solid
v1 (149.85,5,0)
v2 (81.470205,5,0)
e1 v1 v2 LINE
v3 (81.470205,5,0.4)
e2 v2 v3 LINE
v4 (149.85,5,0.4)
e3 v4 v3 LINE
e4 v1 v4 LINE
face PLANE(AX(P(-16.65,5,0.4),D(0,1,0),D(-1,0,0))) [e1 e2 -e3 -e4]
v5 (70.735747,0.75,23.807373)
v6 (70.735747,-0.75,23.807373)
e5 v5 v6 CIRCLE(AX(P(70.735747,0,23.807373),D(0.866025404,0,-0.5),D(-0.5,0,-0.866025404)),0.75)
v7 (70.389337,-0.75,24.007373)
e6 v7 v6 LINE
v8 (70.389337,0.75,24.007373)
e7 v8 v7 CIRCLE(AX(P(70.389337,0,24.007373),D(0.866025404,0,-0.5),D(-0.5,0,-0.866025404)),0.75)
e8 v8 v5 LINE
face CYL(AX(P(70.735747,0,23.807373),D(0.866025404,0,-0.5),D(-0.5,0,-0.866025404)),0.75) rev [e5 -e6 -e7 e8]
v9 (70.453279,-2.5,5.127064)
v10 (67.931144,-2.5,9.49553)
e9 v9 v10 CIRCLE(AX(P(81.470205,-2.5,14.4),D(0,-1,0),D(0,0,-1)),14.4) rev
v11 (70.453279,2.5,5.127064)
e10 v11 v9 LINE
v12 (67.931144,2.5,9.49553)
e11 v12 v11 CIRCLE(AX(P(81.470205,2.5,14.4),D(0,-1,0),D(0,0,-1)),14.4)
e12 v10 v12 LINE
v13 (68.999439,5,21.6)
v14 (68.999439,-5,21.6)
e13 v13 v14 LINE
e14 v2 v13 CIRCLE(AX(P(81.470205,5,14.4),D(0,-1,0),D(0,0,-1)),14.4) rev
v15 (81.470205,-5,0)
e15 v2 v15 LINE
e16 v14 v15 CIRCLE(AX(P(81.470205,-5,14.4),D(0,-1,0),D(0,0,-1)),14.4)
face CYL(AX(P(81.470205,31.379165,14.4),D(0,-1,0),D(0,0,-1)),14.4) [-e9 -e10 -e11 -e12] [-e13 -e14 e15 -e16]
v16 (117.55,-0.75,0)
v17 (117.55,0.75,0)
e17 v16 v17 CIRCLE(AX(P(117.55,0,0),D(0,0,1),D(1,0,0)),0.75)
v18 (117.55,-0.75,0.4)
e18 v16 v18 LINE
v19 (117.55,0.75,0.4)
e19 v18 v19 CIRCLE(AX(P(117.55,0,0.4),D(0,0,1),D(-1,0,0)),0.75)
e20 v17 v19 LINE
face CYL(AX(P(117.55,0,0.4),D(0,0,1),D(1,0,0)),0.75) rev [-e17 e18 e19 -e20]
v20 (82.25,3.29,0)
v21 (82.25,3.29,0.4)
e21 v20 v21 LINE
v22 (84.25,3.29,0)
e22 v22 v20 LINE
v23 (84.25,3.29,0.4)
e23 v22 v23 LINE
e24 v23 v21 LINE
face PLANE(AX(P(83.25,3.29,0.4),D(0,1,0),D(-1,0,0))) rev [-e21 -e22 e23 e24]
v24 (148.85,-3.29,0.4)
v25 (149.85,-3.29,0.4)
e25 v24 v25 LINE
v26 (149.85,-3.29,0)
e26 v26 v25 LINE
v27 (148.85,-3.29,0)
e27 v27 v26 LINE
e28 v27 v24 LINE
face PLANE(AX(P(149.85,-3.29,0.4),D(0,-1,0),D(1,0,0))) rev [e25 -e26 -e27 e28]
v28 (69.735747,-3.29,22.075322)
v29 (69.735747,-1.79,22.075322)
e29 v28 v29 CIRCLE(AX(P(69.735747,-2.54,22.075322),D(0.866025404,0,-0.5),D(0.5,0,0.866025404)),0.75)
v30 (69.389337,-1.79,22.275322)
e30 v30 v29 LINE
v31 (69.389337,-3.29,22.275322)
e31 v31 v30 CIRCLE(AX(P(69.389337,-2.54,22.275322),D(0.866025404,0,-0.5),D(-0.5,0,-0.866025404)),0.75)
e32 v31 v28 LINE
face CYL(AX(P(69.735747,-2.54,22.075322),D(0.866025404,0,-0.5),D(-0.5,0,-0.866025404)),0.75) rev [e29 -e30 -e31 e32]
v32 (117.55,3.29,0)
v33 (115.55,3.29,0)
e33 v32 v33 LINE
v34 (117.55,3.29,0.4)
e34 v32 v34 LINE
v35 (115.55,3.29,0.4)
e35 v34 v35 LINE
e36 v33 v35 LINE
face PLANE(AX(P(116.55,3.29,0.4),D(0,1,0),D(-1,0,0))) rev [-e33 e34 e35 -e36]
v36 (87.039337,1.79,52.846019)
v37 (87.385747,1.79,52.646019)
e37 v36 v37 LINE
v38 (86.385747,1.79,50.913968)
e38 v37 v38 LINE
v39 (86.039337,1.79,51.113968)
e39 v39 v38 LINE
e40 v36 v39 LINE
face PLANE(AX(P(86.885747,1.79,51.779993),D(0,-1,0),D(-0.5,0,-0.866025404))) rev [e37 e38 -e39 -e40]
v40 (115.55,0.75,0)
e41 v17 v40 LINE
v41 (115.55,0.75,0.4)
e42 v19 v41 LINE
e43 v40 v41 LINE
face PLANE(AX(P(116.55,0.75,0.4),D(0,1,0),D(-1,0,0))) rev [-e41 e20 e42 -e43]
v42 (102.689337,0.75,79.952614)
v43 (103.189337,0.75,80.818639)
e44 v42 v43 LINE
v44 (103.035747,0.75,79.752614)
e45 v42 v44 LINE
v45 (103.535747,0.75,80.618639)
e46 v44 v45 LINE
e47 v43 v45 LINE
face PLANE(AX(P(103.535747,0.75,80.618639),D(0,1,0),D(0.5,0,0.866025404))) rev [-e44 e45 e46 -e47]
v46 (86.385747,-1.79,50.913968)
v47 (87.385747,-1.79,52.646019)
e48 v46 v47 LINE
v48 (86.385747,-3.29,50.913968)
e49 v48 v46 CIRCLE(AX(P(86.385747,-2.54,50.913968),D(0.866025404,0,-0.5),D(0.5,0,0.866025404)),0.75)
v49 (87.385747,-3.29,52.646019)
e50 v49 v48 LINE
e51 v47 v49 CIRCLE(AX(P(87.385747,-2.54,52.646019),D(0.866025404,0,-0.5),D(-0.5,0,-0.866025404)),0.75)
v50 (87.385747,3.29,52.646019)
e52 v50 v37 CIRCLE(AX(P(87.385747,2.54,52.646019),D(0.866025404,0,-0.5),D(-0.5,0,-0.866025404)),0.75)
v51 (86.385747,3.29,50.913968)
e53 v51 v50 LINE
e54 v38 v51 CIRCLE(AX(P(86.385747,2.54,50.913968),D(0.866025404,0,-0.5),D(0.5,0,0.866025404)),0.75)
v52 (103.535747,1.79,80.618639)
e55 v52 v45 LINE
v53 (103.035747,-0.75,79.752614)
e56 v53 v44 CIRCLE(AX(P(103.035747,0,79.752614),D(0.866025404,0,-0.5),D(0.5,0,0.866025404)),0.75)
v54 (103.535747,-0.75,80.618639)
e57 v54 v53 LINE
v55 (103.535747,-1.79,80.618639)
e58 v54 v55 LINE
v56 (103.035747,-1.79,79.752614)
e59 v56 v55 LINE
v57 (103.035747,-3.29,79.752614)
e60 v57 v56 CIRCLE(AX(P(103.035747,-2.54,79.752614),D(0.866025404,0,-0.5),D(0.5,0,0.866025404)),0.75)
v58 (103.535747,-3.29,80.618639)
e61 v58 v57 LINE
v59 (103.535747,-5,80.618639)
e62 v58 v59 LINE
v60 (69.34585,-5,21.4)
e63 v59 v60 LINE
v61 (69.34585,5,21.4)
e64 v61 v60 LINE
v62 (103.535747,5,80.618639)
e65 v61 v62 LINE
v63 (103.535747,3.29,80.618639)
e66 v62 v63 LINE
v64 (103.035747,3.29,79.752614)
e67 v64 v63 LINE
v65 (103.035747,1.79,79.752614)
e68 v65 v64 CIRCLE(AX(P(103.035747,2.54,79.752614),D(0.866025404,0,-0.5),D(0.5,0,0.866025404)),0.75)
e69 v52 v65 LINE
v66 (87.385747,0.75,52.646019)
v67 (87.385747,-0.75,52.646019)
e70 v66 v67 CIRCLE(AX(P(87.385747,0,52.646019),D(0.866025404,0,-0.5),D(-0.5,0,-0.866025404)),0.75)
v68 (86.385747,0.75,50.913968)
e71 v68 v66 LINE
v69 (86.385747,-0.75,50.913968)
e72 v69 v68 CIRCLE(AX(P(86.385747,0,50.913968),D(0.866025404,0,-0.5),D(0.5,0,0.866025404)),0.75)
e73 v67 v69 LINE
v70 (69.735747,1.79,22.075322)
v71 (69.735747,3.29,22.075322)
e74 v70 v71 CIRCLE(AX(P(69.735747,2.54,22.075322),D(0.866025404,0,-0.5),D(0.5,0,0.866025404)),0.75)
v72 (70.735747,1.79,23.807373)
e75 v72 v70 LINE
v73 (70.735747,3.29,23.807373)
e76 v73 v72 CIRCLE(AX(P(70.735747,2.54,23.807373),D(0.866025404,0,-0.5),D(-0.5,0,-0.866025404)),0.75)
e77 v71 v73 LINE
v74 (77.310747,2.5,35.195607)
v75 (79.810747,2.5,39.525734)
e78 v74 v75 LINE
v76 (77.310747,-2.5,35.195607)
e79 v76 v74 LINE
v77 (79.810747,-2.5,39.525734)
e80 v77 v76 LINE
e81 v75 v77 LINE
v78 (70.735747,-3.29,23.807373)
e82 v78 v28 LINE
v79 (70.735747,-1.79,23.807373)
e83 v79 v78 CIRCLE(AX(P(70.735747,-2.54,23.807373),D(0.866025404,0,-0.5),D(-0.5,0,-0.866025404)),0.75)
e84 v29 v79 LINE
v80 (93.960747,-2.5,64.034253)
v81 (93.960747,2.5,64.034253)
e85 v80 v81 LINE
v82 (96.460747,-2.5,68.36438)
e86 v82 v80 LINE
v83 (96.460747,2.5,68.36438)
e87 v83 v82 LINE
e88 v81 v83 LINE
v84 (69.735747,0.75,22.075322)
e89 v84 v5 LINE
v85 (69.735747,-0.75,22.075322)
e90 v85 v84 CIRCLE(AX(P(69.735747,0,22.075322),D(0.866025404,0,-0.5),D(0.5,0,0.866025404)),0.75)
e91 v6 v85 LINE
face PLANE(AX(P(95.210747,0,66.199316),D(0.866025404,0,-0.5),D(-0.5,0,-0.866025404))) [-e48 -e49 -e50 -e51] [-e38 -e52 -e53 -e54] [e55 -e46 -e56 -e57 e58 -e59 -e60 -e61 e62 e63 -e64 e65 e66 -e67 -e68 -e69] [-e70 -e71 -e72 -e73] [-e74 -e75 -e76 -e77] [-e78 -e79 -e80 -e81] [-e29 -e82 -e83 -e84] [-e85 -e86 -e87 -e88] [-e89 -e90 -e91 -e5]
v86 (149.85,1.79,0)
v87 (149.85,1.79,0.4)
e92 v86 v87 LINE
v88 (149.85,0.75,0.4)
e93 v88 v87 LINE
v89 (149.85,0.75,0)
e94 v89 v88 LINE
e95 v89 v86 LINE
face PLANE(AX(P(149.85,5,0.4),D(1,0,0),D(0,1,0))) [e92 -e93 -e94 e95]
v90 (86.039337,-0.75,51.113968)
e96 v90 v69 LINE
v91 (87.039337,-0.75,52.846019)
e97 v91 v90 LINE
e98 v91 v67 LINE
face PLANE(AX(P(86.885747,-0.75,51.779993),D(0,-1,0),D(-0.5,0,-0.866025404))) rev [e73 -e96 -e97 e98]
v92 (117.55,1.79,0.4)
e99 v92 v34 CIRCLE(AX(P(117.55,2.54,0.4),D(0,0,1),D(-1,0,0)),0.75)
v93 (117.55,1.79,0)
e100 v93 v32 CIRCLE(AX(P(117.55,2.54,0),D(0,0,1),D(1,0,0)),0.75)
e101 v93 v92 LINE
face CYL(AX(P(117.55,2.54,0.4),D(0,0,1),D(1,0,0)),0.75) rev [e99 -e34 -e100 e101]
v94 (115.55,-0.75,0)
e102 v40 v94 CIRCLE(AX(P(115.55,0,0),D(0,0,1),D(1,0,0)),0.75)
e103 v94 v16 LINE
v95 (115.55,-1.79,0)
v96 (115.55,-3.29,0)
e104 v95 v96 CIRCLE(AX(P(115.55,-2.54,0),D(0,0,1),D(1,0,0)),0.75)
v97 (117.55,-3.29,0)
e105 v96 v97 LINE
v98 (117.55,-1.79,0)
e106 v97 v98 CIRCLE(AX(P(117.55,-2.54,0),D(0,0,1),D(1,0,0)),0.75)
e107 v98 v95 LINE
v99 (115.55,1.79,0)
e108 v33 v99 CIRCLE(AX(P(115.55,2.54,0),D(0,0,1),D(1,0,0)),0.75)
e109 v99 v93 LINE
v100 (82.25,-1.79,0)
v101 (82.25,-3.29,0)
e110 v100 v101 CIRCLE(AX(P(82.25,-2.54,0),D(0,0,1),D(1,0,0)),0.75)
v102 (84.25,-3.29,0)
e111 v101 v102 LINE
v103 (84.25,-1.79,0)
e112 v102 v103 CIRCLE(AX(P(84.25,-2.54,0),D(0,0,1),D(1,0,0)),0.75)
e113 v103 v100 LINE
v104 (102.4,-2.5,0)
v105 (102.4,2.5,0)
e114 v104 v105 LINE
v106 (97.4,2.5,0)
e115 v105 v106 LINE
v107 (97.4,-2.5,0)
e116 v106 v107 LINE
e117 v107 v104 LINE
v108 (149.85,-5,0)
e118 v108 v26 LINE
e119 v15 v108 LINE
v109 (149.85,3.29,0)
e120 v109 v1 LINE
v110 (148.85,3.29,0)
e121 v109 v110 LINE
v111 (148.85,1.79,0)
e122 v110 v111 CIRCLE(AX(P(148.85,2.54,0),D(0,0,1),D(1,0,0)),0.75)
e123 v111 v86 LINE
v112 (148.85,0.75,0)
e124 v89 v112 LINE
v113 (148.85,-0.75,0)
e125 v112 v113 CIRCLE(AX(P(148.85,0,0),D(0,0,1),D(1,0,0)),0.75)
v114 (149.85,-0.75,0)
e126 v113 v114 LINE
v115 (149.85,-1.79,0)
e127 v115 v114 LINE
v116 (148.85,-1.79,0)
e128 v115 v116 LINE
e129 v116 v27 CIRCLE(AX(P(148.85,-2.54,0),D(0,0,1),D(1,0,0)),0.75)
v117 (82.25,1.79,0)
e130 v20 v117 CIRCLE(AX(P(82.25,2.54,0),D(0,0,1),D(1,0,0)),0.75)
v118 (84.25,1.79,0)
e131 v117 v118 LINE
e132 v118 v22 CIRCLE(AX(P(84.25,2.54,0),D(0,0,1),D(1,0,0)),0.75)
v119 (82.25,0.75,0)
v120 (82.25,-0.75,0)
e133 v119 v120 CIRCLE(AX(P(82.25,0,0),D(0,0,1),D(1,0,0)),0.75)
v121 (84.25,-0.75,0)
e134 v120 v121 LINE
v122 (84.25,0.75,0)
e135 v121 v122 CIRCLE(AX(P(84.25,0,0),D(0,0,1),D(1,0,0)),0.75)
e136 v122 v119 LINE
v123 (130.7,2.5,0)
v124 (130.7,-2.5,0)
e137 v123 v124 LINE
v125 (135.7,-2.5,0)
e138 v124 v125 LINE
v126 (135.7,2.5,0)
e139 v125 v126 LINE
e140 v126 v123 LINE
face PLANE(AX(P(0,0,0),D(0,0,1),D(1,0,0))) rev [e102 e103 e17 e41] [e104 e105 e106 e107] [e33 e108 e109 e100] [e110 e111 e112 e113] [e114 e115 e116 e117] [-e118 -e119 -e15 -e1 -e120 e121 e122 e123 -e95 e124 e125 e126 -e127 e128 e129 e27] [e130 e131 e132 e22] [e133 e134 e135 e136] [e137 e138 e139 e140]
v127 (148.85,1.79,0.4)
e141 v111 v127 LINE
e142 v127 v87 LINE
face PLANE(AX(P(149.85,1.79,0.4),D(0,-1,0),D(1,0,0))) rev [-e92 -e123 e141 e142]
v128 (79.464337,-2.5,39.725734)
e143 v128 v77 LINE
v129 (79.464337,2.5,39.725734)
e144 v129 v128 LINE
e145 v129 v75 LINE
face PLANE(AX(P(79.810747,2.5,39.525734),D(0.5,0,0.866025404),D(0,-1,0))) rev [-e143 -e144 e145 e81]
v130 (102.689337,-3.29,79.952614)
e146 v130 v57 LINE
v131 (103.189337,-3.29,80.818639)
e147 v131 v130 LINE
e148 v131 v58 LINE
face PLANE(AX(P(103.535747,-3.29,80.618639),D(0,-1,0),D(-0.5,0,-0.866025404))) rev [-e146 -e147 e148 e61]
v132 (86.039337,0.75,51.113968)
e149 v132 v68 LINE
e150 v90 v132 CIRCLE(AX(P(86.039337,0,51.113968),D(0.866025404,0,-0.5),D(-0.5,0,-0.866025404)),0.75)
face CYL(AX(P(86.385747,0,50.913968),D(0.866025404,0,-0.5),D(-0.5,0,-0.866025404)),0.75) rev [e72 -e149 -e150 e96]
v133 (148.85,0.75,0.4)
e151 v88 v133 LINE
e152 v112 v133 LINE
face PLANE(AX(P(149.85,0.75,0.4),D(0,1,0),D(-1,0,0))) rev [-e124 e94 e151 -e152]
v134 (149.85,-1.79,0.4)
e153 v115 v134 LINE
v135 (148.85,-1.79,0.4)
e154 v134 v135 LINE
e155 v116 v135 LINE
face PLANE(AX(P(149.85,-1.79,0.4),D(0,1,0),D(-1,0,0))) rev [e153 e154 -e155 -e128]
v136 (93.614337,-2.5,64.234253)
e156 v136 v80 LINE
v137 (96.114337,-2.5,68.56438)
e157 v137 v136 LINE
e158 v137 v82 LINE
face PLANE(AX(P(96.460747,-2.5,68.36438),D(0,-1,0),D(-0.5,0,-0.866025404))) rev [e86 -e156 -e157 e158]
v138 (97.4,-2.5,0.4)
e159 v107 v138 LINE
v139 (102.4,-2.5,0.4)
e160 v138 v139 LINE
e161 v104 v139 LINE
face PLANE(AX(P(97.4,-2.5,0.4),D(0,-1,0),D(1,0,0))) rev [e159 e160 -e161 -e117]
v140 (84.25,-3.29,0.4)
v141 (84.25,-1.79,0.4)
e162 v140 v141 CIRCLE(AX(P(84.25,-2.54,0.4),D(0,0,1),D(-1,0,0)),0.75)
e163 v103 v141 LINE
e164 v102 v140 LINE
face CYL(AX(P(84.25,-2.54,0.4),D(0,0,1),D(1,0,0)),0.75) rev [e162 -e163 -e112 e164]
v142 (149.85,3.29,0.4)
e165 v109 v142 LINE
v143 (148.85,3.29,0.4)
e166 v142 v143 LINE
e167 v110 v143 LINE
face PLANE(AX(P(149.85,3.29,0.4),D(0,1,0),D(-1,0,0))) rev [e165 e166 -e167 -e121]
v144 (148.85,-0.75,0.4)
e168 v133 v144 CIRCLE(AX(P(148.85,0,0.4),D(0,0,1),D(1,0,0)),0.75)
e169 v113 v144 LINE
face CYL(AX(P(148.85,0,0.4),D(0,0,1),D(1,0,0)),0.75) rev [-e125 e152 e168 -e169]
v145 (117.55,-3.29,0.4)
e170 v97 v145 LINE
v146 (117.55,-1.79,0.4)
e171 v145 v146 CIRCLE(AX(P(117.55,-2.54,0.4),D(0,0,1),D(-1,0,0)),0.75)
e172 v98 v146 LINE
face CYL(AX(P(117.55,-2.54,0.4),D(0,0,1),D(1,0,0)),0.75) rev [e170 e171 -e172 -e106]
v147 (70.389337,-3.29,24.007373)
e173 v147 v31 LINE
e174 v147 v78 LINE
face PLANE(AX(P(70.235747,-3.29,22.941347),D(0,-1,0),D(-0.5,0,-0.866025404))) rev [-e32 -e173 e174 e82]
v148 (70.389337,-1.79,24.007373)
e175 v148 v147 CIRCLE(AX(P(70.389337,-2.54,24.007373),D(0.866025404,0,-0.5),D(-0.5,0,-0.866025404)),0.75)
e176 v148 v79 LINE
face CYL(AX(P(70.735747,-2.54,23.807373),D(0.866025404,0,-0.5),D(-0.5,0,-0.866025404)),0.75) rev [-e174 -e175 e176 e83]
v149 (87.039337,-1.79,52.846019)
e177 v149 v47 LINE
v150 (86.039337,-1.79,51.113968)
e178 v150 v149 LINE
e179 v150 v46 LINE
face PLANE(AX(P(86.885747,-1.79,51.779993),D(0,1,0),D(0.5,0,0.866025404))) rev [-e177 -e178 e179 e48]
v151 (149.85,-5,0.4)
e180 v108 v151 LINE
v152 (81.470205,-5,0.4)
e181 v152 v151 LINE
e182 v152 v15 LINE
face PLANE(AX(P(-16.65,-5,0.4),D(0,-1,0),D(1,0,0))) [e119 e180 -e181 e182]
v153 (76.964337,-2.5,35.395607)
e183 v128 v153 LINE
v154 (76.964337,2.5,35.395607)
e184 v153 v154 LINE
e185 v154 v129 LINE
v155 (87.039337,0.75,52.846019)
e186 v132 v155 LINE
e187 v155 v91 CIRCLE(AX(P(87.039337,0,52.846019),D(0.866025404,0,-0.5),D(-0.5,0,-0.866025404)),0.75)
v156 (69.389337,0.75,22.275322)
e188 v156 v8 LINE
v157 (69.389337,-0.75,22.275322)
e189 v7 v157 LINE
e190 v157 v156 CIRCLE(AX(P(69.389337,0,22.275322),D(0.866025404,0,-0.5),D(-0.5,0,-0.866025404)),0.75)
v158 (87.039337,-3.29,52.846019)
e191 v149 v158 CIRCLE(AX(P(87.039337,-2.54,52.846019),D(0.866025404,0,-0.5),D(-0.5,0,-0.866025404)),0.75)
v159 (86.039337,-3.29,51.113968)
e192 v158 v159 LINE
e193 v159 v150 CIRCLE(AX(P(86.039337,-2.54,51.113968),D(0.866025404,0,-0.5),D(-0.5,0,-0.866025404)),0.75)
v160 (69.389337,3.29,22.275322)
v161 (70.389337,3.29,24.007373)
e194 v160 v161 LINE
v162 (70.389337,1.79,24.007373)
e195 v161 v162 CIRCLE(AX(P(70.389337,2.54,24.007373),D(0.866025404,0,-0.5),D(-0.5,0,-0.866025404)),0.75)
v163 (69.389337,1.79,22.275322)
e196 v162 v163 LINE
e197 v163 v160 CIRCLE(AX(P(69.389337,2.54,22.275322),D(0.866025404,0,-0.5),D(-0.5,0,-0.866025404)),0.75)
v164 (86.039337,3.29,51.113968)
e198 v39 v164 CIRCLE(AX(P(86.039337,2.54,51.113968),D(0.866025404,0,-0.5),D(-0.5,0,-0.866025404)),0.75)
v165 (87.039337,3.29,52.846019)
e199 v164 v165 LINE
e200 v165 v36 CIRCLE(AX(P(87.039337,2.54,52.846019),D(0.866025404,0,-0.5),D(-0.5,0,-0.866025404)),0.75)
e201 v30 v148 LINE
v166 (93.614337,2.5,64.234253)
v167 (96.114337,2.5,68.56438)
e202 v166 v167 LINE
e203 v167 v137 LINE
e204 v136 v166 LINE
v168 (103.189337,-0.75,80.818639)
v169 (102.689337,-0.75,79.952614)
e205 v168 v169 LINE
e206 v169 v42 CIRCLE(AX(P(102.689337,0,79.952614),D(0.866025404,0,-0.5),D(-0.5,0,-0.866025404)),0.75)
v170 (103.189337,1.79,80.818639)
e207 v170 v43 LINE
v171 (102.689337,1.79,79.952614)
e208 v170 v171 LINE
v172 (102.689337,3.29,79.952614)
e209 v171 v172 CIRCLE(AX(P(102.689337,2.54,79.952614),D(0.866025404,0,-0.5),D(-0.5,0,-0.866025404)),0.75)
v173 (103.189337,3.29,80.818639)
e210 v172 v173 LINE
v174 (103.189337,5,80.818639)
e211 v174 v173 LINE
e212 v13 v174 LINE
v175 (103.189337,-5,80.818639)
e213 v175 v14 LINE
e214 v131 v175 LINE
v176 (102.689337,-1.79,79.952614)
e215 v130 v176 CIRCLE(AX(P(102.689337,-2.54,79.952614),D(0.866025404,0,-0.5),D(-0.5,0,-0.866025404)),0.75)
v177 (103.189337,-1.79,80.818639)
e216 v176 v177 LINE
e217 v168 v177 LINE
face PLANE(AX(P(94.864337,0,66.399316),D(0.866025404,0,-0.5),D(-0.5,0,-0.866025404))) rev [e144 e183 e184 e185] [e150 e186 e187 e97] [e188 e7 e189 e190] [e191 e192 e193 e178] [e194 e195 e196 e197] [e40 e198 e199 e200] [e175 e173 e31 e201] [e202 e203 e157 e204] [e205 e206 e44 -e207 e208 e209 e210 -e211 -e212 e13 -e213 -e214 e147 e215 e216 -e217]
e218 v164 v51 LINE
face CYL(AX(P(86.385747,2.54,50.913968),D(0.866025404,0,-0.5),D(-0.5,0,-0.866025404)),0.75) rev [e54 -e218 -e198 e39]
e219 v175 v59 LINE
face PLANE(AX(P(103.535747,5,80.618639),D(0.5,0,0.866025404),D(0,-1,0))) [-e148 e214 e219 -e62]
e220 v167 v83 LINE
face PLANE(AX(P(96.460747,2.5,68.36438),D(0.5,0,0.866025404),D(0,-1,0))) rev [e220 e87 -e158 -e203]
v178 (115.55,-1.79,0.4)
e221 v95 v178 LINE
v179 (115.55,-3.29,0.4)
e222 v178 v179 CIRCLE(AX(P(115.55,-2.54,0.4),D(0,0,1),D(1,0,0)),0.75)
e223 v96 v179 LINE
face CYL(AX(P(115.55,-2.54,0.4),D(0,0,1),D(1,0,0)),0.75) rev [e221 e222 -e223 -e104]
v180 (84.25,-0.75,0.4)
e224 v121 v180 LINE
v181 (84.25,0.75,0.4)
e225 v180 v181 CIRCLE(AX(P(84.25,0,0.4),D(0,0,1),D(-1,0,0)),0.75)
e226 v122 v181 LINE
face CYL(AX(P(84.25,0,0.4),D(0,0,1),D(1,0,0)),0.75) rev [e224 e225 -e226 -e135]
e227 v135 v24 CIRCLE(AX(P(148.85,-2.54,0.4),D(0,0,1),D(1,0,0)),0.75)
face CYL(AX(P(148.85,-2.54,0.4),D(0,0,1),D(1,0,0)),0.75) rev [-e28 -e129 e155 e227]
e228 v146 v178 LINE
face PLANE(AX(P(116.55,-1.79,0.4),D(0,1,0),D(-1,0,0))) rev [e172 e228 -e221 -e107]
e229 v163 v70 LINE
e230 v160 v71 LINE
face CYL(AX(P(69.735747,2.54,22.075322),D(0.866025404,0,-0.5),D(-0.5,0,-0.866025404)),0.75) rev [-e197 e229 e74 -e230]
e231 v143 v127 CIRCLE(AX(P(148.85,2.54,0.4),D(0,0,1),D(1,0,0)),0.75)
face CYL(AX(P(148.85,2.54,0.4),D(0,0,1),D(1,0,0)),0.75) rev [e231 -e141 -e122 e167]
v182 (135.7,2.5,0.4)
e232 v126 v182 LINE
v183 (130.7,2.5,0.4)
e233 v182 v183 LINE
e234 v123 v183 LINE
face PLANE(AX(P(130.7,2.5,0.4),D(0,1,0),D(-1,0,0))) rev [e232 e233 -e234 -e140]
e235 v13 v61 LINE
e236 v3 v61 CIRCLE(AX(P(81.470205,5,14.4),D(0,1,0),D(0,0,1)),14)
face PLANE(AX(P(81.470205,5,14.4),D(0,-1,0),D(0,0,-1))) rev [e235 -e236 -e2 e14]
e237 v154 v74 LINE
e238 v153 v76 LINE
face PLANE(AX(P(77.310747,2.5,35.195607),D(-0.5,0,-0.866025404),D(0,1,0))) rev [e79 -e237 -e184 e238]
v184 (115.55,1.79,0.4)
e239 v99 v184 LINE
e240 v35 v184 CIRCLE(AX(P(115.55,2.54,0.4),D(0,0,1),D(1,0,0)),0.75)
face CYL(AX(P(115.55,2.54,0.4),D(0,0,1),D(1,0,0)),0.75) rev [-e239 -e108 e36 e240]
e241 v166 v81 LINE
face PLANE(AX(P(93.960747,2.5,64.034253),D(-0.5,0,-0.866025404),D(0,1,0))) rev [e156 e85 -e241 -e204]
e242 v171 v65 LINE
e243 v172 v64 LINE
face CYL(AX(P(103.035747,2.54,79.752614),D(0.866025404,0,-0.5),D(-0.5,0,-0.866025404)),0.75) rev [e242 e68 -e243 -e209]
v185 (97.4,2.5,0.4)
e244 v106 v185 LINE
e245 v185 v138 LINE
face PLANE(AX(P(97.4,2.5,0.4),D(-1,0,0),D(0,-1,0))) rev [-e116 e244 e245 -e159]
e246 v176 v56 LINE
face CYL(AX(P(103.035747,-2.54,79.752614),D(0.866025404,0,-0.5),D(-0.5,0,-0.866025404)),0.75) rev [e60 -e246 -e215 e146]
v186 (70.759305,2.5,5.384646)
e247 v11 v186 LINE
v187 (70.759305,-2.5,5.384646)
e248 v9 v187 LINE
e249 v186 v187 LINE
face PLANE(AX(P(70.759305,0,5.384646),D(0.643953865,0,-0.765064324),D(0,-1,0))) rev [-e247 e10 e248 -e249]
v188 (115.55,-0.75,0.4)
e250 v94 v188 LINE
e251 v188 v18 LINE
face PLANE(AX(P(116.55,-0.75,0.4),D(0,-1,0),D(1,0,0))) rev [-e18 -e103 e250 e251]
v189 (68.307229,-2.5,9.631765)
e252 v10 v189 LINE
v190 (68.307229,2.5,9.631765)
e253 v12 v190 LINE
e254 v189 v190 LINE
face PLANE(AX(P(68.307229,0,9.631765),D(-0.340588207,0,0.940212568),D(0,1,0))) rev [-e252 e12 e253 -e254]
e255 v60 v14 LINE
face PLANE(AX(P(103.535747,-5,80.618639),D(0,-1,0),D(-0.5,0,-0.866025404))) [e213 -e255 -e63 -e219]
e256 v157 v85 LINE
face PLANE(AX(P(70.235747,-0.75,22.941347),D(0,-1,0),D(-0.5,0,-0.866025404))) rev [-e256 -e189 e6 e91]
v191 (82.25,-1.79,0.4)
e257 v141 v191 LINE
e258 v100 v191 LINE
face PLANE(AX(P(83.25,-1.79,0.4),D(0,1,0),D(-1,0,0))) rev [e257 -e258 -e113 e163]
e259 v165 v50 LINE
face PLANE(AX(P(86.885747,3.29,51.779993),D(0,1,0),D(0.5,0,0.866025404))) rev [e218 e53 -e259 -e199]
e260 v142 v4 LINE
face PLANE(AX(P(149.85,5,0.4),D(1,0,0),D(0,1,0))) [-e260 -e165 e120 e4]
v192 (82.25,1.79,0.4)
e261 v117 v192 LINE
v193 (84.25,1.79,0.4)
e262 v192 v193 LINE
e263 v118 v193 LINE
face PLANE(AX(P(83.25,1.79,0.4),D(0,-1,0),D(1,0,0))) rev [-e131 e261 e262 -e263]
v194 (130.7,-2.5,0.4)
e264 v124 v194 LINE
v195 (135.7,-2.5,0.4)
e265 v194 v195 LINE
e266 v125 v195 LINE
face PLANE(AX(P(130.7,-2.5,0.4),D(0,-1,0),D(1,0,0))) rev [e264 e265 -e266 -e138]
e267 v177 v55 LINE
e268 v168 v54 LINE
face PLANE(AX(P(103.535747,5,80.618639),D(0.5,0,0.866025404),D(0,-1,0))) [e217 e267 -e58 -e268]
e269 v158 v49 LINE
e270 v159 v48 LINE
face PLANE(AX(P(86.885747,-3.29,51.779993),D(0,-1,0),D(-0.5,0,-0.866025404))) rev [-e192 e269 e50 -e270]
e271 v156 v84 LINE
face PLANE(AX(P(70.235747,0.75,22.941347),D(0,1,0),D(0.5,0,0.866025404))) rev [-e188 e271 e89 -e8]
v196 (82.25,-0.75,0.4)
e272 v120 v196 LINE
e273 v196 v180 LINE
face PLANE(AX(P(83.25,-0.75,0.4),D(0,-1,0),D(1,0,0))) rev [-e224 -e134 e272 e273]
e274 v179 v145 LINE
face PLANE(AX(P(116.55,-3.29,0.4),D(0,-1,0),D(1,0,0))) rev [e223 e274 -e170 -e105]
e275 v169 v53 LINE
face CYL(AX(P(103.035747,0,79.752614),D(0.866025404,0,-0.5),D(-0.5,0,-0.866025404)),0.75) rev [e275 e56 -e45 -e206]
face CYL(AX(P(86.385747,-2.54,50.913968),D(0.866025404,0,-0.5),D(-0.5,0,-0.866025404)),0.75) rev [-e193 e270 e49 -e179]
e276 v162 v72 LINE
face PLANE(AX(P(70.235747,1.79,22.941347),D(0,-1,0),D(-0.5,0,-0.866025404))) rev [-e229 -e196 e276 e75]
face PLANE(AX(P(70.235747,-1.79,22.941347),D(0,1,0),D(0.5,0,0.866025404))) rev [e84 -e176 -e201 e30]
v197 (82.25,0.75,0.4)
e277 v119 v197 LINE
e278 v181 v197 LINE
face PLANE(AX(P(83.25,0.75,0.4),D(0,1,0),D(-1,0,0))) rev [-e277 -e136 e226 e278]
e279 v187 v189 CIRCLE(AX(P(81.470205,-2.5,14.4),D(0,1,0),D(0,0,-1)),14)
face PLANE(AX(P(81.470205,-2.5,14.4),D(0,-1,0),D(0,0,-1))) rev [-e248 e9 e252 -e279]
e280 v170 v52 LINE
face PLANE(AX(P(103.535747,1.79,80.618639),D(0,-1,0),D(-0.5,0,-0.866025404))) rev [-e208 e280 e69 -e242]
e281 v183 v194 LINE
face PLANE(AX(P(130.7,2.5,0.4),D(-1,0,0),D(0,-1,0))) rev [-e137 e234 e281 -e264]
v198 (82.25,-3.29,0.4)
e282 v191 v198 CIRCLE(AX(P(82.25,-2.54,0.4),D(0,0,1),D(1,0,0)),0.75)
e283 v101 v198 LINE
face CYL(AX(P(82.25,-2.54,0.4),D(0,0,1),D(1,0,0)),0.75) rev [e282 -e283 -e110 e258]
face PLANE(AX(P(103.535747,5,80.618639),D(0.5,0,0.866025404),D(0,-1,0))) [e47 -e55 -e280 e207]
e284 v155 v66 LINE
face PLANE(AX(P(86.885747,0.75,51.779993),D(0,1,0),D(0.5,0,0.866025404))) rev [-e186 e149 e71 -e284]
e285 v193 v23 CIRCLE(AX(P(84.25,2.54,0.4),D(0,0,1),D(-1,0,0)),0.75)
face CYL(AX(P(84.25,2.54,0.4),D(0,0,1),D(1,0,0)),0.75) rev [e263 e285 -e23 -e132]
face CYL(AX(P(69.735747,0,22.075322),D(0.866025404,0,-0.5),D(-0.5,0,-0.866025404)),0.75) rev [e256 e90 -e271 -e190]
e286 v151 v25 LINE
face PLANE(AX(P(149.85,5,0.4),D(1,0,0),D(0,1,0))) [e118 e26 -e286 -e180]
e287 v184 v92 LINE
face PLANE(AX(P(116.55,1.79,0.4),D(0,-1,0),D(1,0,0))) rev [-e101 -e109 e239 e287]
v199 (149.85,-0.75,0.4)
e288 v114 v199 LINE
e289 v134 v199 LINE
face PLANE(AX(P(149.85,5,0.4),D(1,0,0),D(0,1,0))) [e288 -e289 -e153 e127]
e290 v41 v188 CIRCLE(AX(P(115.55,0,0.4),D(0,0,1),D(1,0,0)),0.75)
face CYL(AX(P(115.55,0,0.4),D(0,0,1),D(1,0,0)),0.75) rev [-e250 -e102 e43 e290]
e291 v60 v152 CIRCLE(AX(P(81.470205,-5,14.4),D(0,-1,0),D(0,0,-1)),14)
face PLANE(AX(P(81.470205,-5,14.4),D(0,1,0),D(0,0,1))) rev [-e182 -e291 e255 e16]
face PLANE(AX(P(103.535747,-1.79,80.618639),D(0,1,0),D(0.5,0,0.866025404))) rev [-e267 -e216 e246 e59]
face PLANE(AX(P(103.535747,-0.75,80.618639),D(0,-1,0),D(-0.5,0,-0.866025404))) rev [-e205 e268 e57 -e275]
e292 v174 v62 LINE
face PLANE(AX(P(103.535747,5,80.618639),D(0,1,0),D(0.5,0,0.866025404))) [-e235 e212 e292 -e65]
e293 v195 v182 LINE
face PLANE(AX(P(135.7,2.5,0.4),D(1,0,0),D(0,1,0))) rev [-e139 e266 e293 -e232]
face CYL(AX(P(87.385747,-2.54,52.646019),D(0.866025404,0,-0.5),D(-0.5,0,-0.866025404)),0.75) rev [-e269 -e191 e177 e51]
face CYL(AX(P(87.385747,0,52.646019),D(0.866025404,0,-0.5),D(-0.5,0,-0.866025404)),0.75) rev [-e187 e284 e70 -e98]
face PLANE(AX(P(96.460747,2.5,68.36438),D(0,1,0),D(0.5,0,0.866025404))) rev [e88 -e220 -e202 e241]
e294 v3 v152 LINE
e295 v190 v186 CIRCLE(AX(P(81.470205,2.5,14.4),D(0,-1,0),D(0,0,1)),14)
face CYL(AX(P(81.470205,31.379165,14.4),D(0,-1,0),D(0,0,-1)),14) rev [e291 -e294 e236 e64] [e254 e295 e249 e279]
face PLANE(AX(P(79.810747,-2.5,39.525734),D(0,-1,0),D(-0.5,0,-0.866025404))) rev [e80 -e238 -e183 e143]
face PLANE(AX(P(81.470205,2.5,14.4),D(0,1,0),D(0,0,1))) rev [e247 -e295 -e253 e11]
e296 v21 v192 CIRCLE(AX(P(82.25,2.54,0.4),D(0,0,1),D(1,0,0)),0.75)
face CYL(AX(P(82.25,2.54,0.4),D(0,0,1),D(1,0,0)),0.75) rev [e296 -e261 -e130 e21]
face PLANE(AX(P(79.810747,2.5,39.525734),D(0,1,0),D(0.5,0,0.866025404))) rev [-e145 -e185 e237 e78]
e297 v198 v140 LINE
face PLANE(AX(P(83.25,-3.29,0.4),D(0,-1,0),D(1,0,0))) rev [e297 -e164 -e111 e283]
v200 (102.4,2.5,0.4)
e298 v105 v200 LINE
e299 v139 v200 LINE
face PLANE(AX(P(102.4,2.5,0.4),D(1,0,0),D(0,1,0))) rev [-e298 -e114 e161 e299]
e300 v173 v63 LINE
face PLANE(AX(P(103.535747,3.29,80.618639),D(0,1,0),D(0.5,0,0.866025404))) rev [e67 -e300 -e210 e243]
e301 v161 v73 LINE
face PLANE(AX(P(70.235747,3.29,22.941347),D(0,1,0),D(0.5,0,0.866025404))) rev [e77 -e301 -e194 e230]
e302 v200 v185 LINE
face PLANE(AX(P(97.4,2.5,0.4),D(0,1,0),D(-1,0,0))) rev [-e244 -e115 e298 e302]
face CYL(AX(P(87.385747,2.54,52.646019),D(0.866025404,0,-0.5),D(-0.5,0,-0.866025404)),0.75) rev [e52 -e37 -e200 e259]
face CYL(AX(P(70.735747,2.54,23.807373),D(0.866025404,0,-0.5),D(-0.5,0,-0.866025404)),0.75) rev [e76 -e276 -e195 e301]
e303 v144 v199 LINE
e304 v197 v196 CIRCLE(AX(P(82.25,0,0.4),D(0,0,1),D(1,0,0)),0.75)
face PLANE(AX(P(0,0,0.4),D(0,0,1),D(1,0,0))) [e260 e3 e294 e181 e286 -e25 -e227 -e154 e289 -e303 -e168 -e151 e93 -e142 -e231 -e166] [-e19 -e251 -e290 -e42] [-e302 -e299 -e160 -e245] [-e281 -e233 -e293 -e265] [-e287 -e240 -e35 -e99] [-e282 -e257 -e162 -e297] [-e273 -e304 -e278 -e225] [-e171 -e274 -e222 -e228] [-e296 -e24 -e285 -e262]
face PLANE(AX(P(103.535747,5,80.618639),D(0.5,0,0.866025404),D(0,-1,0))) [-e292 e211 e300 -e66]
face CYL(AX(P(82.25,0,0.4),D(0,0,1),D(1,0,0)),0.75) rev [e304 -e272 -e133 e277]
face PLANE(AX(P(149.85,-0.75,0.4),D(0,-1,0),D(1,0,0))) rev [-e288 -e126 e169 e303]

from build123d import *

# Parameters (mm, degrees)
ESQUISSE1_W                 = 33.3
ESQUISSE1_H                 = 10
BOSS_EXTRU_1_DEPTH          = 0.4
ESQUISSE51_W                = 5
ESQUISSE51_H                = 5
BOSS_EXTRU_3_DEPTH          = 1.75
ENL_V_MAT_EXTRU_2_DEPTH     = 0.1
R_P_TITION_LIN_AIRE4_COUNT  = 5
R_P_TITION_LIN_AIRE4_PITCH  = 33.3
CONVERTIR_VOLUME3_OUTLINE_W = 5
CONVERTIR_VOLUME3_OUTLINE_H = 5
CONVERTIR_VOLUME3_DEPTH     = 2.15
PLI_START                   = -5
PLI_ESQUISS_9_DEPTH         = 10
PLI_ESQUISS_9_2_DEPTH       = 10
PLI_ESQUISS_9_3_DEPTH       = 2.5
PLI_START_2                 = 2.5
PLI_ESQUISS_9_4_DEPTH       = 2.5
PLI_START_3                 = 48.955267378
PLI_ESQUISS_9_5_DEPTH       = 0.4


with BuildPart() as part:
    # Esquisse1 → Boss.-Extru.1 (new body)
    with BuildSketch(Plane.XY):
        Rectangle(ESQUISSE1_W, ESQUISSE1_H)
    boss_extru_1 = extrude(amount=BOSS_EXTRU_1_DEPTH)

    # Esquisse51 → Boss.-Extru.3 (add)
    with BuildSketch(Plane.XY.offset(0.4)):
        Rectangle(ESQUISSE51_W, ESQUISSE51_H)
    boss_extru_3 = extrude(amount=BOSS_EXTRU_3_DEPTH)

    # Esquisse52 → Enlèv. mat.-Extru.2 (cut)
    with BuildSketch(Plane.XY.offset(0.4)):
        with BuildLine():
            Line((16.65, 0.75), (15.65, 0.75))
            ThreePointArc((15.65, 0.75), (14.9, 0), (15.65, -0.75))
            Line((15.65, -0.75), (16.65, -0.75))
            Line((16.65, -0.75), (16.65, 0.75))
        make_face()
        with BuildLine():
            Line((16.65, 3.29), (15.65, 3.29))
            ThreePointArc((15.65, 3.29), (14.9, 2.54), (15.65, 1.79))
            Line((15.65, 1.79), (16.65, 1.79))
            Line((16.65, 1.79), (16.65, 3.29))
        make_face()
        with BuildLine():
            Line((16.65, -1.79), (15.65, -1.79))
            ThreePointArc((15.65, -1.79), (14.9, -2.54), (15.65, -3.29))
            Line((15.65, -3.29), (16.65, -3.29))
            Line((16.65, -3.29), (16.65, -1.79))
        make_face()
        with BuildLine():
            Line((-16.65, -3.29), (-15.65, -3.29))
            ThreePointArc((-15.65, -3.29), (-14.9, -2.54), (-15.65, -1.79))
            Line((-15.65, -1.79), (-16.65, -1.79))
            Line((-16.65, -1.79), (-16.65, -3.29))
        make_face()
        with BuildLine():
            Line((-16.65, 1.79), (-15.65, 1.79))
            ThreePointArc((-15.65, 1.79), (-14.9, 2.54), (-15.65, 3.29))
            Line((-15.65, 3.29), (-16.65, 3.29))
            Line((-16.65, 3.29), (-16.65, 1.79))
        make_face()
        with BuildLine():
            Line((-16.65, -0.75), (-15.65, -0.75))
            ThreePointArc((-15.65, -0.75), (-14.9, 0), (-15.65, 0.75))
            Line((-15.65, 0.75), (-16.65, 0.75))
            Line((-16.65, 0.75), (-16.65, -0.75))
        make_face()
    enl_v_mat_extru_2 = extrude(amount=-ENL_V_MAT_EXTRU_2_DEPTH, mode=Mode.SUBTRACT)

    # Répétition linéaire4: Boss.-Extru.1, Boss.-Extru.3, Enlèv. mat.-Extru.2 ×5
    with Locations(*[(i * R_P_TITION_LIN_AIRE4_PITCH, 0, 0) for i in range(1, R_P_TITION_LIN_AIRE4_COUNT)]):
        add(boss_extru_1)
        add(boss_extru_3)
        add(enl_v_mat_extru_2, mode=Mode.SUBTRACT)

    # Convertir-Volume3: read off the stored shape, not the designer's step
    # Convertir-Volume3 outline → Convertir-Volume3 (cut)
    with BuildSketch(Plane.XY):
        with Locations((133.2, 0)):
            Rectangle(CONVERTIR_VOLUME3_OUTLINE_W, CONVERTIR_VOLUME3_OUTLINE_H)
        with Locations((99.9, 0)):
            Rectangle(CONVERTIR_VOLUME3_OUTLINE_W, CONVERTIR_VOLUME3_OUTLINE_H)
        with Locations((66.6, 0)):
            Rectangle(CONVERTIR_VOLUME3_OUTLINE_W, CONVERTIR_VOLUME3_OUTLINE_H)
        with Locations((33.3, 0)):
            Rectangle(CONVERTIR_VOLUME3_OUTLINE_W, CONVERTIR_VOLUME3_OUTLINE_H)
        Rectangle(CONVERTIR_VOLUME3_OUTLINE_W, CONVERTIR_VOLUME3_OUTLINE_H)
        with BuildLine():
            ThreePointArc((50.95, -0.75), (51.7, 0), (50.95, 0.75))
            Line((50.95, 0.75), (48.95, 0.75))
            ThreePointArc((48.95, 0.75), (48.2, 0), (48.95, -0.75))
            Line((48.95, -0.75), (50.95, -0.75))
        make_face()
        with BuildLine():
            Line((149.85, -0.75), (149.85, 0.75))
            Line((149.85, 0.75), (148.85, 0.75))
            ThreePointArc((148.85, 0.75), (148.1, 0), (148.85, -0.75))
            Line((148.85, -0.75), (149.85, -0.75))
        make_face()
        with BuildLine():
            Line((148.85, 1.79), (149.85, 1.79))
            Line((149.85, 1.79), (149.85, 3.29))
            Line((149.85, 3.29), (148.85, 3.29))
            ThreePointArc((148.85, 3.29), (148.1, 2.54), (148.85, 1.79))
        make_face()
        with BuildLine():
            Line((149.85, -3.29), (149.85, -1.79))
            Line((149.85, -1.79), (148.85, -1.79))
            ThreePointArc((148.85, -1.79), (148.1, -2.54), (148.85, -3.29))
            Line((148.85, -3.29), (149.85, -3.29))
        make_face()
        with BuildLine():
            ThreePointArc((-15.65, -0.75), (-14.9, 0), (-15.65, 0.75))
            Line((-15.65, 0.75), (-16.65, 0.75))
            Line((-16.65, 0.75), (-16.65, -0.75))
            Line((-16.65, -0.75), (-15.65, -0.75))
        make_face()
        with BuildLine():
            Line((-15.65, -1.79), (-16.65, -1.79))
            Line((-16.65, -1.79), (-16.65, -3.29))
            Line((-16.65, -3.29), (-15.65, -3.29))
            ThreePointArc((-15.65, -3.29), (-14.9, -2.54), (-15.65, -1.79))
        make_face()
        with BuildLine():
            Line((-16.65, 3.29), (-16.65, 1.79))
            Line((-16.65, 1.79), (-15.65, 1.79))
            ThreePointArc((-15.65, 1.79), (-14.9, 2.54), (-15.65, 3.29))
            Line((-15.65, 3.29), (-16.65, 3.29))
        make_face()
        with BuildLine():
            ThreePointArc((17.65, -0.75), (18.4, 0), (17.65, 0.75))
            Line((17.65, 0.75), (15.65, 0.75))
            ThreePointArc((15.65, 0.75), (14.9, 0), (15.65, -0.75))
            Line((15.65, -0.75), (17.65, -0.75))
        make_face()
        with BuildLine():
            ThreePointArc((84.25, -0.75), (85, 0), (84.25, 0.75))
            Line((84.25, 0.75), (82.25, 0.75))
            ThreePointArc((82.25, 0.75), (81.5, 0), (82.25, -0.75))
            Line((82.25, -0.75), (84.25, -0.75))
        make_face()
        with BuildLine():
            ThreePointArc((117.55, -0.75), (118.3, 0), (117.55, 0.75))
            Line((117.55, 0.75), (115.55, 0.75))
            ThreePointArc((115.55, 0.75), (114.8, 0), (115.55, -0.75))
            Line((115.55, -0.75), (117.55, -0.75))
        make_face()
        with BuildLine():
            ThreePointArc((82.25, 3.29), (81.5, 2.54), (82.25, 1.79))
            Line((82.25, 1.79), (84.25, 1.79))
            ThreePointArc((84.25, 1.79), (85, 2.54), (84.25, 3.29))
            Line((84.25, 3.29), (82.25, 3.29))
        make_face()
        with BuildLine():
            ThreePointArc((48.95, 3.29), (48.2, 2.54), (48.95, 1.79))
            Line((48.95, 1.79), (50.95, 1.79))
            ThreePointArc((50.95, 1.79), (51.7, 2.54), (50.95, 3.29))
            Line((50.95, 3.29), (48.95, 3.29))
        make_face()
        with BuildLine():
            ThreePointArc((115.55, 3.29), (114.8, 2.54), (115.55, 1.79))
            Line((115.55, 1.79), (117.55, 1.79))
            ThreePointArc((117.55, 1.79), (118.3, 2.54), (117.55, 3.29))
            Line((117.55, 3.29), (115.55, 3.29))
        make_face()
        with BuildLine():
            ThreePointArc((15.65, 3.29), (14.9, 2.54), (15.65, 1.79))
            Line((15.65, 1.79), (17.65, 1.79))
            ThreePointArc((17.65, 1.79), (18.4, 2.54), (17.65, 3.29))
            Line((17.65, 3.29), (15.65, 3.29))
        make_face()
        with BuildLine():
            ThreePointArc((84.25, -3.29), (85, -2.54), (84.25, -1.79))
            Line((84.25, -1.79), (82.25, -1.79))
            ThreePointArc((82.25, -1.79), (81.5, -2.54), (82.25, -3.29))
            Line((82.25, -3.29), (84.25, -3.29))
        make_face()
        with BuildLine():
            ThreePointArc((17.65, -3.29), (18.4, -2.54), (17.65, -1.79))
            Line((17.65, -1.79), (15.65, -1.79))
            ThreePointArc((15.65, -1.79), (14.9, -2.54), (15.65, -3.29))
            Line((15.65, -3.29), (17.65, -3.29))
        make_face()
        with BuildLine():
            ThreePointArc((50.95, -3.29), (51.7, -2.54), (50.95, -1.79))
            Line((50.95, -1.79), (48.95, -1.79))
            ThreePointArc((48.95, -1.79), (48.2, -2.54), (48.95, -3.29))
            Line((48.95, -3.29), (50.95, -3.29))
        make_face()
        with BuildLine():
            ThreePointArc((117.55, -3.29), (118.3, -2.54), (117.55, -1.79))
            Line((117.55, -1.79), (115.55, -1.79))
            ThreePointArc((115.55, -1.79), (114.8, -2.54), (115.55, -3.29))
            Line((115.55, -3.29), (117.55, -3.29))
        make_face()
    extrude(amount=CONVERTIR_VOLUME3_DEPTH, mode=Mode.SUBTRACT)

    # Pli esquissé9: read off the stored shape, not the designer's step
    # Pli esquissé9 outline → Pli esquissé9 (cut)
    with BuildSketch(Plane(origin=(0, 0, 0), x_dir=(1, 0, 0), z_dir=(0, 1, 0)).offset(PLI_START)):
        with BuildLine():
            ThreePointArc((78.099745317, -0.4), (79.773148952, -0.100349655), (81.470205227, 0))
            Line((81.470205227, 0), (-16.65, 0))
            Line((-16.65, 0), (-16.65, -0.4))
            Line((-16.65, -0.4), (78.099745317, -0.4))
        make_face()
    extrude(amount=PLI_ESQUISS_9_DEPTH, mode=Mode.SUBTRACT)

    # Pli esquiss_9 2 outline → Pli esquiss_9 2 (add)
    with BuildSketch(Plane(origin=(0, 0, 0), x_dir=(1, 0, 0), z_dir=(0, 1, 0)).offset(PLI_START)):
        Polygon((96.114336799, -68.564379915), (103.189336799, -80.818639379), (103.535746961, -80.618639379), (96.460746961, -68.364379915), align=None)
        Polygon((79.464336799, -39.725733969), (93.614336799, -64.234252897), (93.960746961, -64.034252897), (79.810746961, -39.525733969), align=None)
        with BuildLine():
            Line((68.999439412, -21.6), (76.964336798, -35.39560695))
            Line((76.964336798, -35.39560695), (77.310746961, -35.19560695))
            Line((77.310746961, -35.19560695), (69.345849574, -21.4))
            ThreePointArc((69.345849574, -21.4), (67.524412919, -15.630803354), (68.307229274, -9.631765099))
            Line((68.307229274, -9.631765099), (67.931144247, -9.495529816))
            ThreePointArc((67.931144247, -9.495529816), (67.125961709, -15.665969164), (68.999439412, -21.6))
        make_face()
        with BuildLine():
            ThreePointArc((78.099745317, -0.4), (73.898184062, -2.151551303), (70.453278966, -5.12706434))
            Line((70.453278966, -5.12706434), (70.759304695, -5.384645886))
            ThreePointArc((70.759304695, -5.384645886), (75.563216044, -1.707187908), (81.470205227, -0.4))
            Line((81.470205227, -0.4), (78.099745317, -0.4))
        make_face()
    extrude(amount=PLI_ESQUISS_9_2_DEPTH)

    # Pli esquiss_9 3 outline → Pli esquiss_9 3 (add)
    with BuildSketch(Plane(origin=(0, 0, 0), x_dir=(1, 0, 0), z_dir=(0, 1, 0)).offset(PLI_START)):
        Polygon((93.614336799, -64.234252897), (96.114336799, -68.564379915), (96.460746961, -68.364379915), (93.960746961, -64.034252897), align=None)
        Polygon((76.964336798, -35.39560695), (79.464336799, -39.725733969), (79.810746961, -39.525733969), (77.31074696, -35.19560695), align=None)
        with BuildLine():
            ThreePointArc((70.453278966, -5.12706434), (68.999439412, -7.2), (67.931144247, -9.495529816))
            Line((67.931144247, -9.495529816), (68.307229274, -9.631765099))
            ThreePointArc((68.307229274, -9.631765099), (69.345849574, -7.4), (70.759304695, -5.384645886))
            Line((70.759304695, -5.384645886), (70.453278966, -5.12706434))
        make_face()
    extrude(amount=PLI_ESQUISS_9_3_DEPTH)

    # Pli esquiss_9 4 outline → Pli esquiss_9 4 (add)
    with BuildSketch(Plane(origin=(0, 0, 0), x_dir=(1, 0, 0), z_dir=(0, 1, 0)).offset(PLI_START_2)):
        Polygon((93.614336799, -64.234252897), (96.114336799, -68.564379915), (96.460746961, -68.364379915), (93.960746961, -64.034252897), align=None)
        Polygon((76.964336798, -35.39560695), (79.464336799, -39.725733969), (79.810746961, -39.525733969), (77.31074696, -35.19560695), align=None)
        with BuildLine():
            ThreePointArc((70.453278966, -5.12706434), (68.999439412, -7.2), (67.931144247, -9.495529816))
            Line((67.931144247, -9.495529816), (68.307229274, -9.631765099))
            ThreePointArc((68.307229274, -9.631765099), (69.345849574, -7.4), (70.759304695, -5.384645886))
            Line((70.759304695, -5.384645886), (70.453278966, -5.12706434))
        make_face()
    extrude(amount=PLI_ESQUISS_9_4_DEPTH)

    # Pli esquiss_9 5 outline → Pli esquiss_9 5 (cut)
    with BuildSketch(Plane(origin=(0, 0, 0), x_dir=(0.500000000000004, 0, 0.8660254037844363), z_dir=(0.8660254037844363, 0, -0.5000000000000042)).offset(PLI_START_3)):
        with BuildLine():
            ThreePointArc((53.985663201, 0.75), (53.235663201, 0), (53.985663201, -0.75))
            Line((53.985663201, -0.75), (55.985663201, -0.75))
            ThreePointArc((55.985663201, -0.75), (56.735663201, 0), (55.985663201, 0.75))
            Line((55.985663201, 0.75), (53.985663201, 0.75))
        make_face()
        with BuildLine():
            ThreePointArc((120.585663201, 0.75), (119.835663201, 0), (120.585663201, -0.75))
            Line((120.585663201, -0.75), (121.585663201, -0.75))
            Line((121.585663201, -0.75), (121.585663201, 0.75))
            Line((121.585663201, 0.75), (120.585663201, 0.75))
        make_face()
        with BuildLine():
            Line((120.585663201, 1.79), (121.585663201, 1.79))
            Line((121.585663201, 1.79), (121.585663201, 3.29))
            Line((121.585663201, 3.29), (120.585663201, 3.29))
            ThreePointArc((120.585663201, 3.29), (119.835663201, 2.54), (120.585663201, 1.79))
        make_face()
        with BuildLine():
            Line((121.585663201, -3.29), (121.585663201, -1.79))
            Line((121.585663201, -1.79), (120.585663201, -1.79))
            ThreePointArc((120.585663201, -1.79), (119.835663201, -2.54), (120.585663201, -3.29))
            Line((120.585663201, -3.29), (121.585663201, -3.29))
        make_face()
        with BuildLine():
            ThreePointArc((87.285663201, 0.75), (86.535663201, 0), (87.285663201, -0.75))
            Line((87.285663201, -0.75), (89.285663201, -0.75))
            ThreePointArc((89.285663201, -0.75), (90.035663201, 0), (89.285663201, 0.75))
            Line((89.285663201, 0.75), (87.285663201, 0.75))
        make_face()
        with BuildLine():
            ThreePointArc((87.285663201, -1.79), (86.535663201, -2.54), (87.285663201, -3.29))
            Line((87.285663201, -3.29), (89.285663201, -3.29))
            ThreePointArc((89.285663201, -3.29), (90.035663201, -2.54), (89.285663201, -1.79))
            Line((89.285663201, -1.79), (87.285663201, -1.79))
        make_face()
        with BuildLine():
            ThreePointArc((53.985663201, -1.79), (53.235663201, -2.54), (53.985663201, -3.29))
            Line((53.985663201, -3.29), (55.985663201, -3.29))
            ThreePointArc((55.985663201, -3.29), (56.735663201, -2.54), (55.985663201, -1.79))
            Line((55.985663201, -1.79), (53.985663201, -1.79))
        make_face()
        with BuildLine():
            ThreePointArc((87.285663201, 3.29), (86.535663201, 2.54), (87.285663201, 1.79))
            Line((87.285663201, 1.79), (89.285663201, 1.79))
            ThreePointArc((89.285663201, 1.79), (90.035663201, 2.54), (89.285663201, 3.29))
            Line((89.285663201, 3.29), (87.285663201, 3.29))
        make_face()
        with BuildLine():
            ThreePointArc((53.985663201, 3.29), (53.235663201, 2.54), (53.985663201, 1.79))
            Line((53.985663201, 1.79), (55.985663201, 1.79))
            ThreePointArc((55.985663201, 1.79), (56.735663201, 2.54), (55.985663201, 3.29))
            Line((55.985663201, 3.29), (53.985663201, 3.29))
        make_face()
    extrude(amount=PLI_ESQUISS_9_5_DEPTH, mode=Mode.SUBTRACT)


solid = part.part
